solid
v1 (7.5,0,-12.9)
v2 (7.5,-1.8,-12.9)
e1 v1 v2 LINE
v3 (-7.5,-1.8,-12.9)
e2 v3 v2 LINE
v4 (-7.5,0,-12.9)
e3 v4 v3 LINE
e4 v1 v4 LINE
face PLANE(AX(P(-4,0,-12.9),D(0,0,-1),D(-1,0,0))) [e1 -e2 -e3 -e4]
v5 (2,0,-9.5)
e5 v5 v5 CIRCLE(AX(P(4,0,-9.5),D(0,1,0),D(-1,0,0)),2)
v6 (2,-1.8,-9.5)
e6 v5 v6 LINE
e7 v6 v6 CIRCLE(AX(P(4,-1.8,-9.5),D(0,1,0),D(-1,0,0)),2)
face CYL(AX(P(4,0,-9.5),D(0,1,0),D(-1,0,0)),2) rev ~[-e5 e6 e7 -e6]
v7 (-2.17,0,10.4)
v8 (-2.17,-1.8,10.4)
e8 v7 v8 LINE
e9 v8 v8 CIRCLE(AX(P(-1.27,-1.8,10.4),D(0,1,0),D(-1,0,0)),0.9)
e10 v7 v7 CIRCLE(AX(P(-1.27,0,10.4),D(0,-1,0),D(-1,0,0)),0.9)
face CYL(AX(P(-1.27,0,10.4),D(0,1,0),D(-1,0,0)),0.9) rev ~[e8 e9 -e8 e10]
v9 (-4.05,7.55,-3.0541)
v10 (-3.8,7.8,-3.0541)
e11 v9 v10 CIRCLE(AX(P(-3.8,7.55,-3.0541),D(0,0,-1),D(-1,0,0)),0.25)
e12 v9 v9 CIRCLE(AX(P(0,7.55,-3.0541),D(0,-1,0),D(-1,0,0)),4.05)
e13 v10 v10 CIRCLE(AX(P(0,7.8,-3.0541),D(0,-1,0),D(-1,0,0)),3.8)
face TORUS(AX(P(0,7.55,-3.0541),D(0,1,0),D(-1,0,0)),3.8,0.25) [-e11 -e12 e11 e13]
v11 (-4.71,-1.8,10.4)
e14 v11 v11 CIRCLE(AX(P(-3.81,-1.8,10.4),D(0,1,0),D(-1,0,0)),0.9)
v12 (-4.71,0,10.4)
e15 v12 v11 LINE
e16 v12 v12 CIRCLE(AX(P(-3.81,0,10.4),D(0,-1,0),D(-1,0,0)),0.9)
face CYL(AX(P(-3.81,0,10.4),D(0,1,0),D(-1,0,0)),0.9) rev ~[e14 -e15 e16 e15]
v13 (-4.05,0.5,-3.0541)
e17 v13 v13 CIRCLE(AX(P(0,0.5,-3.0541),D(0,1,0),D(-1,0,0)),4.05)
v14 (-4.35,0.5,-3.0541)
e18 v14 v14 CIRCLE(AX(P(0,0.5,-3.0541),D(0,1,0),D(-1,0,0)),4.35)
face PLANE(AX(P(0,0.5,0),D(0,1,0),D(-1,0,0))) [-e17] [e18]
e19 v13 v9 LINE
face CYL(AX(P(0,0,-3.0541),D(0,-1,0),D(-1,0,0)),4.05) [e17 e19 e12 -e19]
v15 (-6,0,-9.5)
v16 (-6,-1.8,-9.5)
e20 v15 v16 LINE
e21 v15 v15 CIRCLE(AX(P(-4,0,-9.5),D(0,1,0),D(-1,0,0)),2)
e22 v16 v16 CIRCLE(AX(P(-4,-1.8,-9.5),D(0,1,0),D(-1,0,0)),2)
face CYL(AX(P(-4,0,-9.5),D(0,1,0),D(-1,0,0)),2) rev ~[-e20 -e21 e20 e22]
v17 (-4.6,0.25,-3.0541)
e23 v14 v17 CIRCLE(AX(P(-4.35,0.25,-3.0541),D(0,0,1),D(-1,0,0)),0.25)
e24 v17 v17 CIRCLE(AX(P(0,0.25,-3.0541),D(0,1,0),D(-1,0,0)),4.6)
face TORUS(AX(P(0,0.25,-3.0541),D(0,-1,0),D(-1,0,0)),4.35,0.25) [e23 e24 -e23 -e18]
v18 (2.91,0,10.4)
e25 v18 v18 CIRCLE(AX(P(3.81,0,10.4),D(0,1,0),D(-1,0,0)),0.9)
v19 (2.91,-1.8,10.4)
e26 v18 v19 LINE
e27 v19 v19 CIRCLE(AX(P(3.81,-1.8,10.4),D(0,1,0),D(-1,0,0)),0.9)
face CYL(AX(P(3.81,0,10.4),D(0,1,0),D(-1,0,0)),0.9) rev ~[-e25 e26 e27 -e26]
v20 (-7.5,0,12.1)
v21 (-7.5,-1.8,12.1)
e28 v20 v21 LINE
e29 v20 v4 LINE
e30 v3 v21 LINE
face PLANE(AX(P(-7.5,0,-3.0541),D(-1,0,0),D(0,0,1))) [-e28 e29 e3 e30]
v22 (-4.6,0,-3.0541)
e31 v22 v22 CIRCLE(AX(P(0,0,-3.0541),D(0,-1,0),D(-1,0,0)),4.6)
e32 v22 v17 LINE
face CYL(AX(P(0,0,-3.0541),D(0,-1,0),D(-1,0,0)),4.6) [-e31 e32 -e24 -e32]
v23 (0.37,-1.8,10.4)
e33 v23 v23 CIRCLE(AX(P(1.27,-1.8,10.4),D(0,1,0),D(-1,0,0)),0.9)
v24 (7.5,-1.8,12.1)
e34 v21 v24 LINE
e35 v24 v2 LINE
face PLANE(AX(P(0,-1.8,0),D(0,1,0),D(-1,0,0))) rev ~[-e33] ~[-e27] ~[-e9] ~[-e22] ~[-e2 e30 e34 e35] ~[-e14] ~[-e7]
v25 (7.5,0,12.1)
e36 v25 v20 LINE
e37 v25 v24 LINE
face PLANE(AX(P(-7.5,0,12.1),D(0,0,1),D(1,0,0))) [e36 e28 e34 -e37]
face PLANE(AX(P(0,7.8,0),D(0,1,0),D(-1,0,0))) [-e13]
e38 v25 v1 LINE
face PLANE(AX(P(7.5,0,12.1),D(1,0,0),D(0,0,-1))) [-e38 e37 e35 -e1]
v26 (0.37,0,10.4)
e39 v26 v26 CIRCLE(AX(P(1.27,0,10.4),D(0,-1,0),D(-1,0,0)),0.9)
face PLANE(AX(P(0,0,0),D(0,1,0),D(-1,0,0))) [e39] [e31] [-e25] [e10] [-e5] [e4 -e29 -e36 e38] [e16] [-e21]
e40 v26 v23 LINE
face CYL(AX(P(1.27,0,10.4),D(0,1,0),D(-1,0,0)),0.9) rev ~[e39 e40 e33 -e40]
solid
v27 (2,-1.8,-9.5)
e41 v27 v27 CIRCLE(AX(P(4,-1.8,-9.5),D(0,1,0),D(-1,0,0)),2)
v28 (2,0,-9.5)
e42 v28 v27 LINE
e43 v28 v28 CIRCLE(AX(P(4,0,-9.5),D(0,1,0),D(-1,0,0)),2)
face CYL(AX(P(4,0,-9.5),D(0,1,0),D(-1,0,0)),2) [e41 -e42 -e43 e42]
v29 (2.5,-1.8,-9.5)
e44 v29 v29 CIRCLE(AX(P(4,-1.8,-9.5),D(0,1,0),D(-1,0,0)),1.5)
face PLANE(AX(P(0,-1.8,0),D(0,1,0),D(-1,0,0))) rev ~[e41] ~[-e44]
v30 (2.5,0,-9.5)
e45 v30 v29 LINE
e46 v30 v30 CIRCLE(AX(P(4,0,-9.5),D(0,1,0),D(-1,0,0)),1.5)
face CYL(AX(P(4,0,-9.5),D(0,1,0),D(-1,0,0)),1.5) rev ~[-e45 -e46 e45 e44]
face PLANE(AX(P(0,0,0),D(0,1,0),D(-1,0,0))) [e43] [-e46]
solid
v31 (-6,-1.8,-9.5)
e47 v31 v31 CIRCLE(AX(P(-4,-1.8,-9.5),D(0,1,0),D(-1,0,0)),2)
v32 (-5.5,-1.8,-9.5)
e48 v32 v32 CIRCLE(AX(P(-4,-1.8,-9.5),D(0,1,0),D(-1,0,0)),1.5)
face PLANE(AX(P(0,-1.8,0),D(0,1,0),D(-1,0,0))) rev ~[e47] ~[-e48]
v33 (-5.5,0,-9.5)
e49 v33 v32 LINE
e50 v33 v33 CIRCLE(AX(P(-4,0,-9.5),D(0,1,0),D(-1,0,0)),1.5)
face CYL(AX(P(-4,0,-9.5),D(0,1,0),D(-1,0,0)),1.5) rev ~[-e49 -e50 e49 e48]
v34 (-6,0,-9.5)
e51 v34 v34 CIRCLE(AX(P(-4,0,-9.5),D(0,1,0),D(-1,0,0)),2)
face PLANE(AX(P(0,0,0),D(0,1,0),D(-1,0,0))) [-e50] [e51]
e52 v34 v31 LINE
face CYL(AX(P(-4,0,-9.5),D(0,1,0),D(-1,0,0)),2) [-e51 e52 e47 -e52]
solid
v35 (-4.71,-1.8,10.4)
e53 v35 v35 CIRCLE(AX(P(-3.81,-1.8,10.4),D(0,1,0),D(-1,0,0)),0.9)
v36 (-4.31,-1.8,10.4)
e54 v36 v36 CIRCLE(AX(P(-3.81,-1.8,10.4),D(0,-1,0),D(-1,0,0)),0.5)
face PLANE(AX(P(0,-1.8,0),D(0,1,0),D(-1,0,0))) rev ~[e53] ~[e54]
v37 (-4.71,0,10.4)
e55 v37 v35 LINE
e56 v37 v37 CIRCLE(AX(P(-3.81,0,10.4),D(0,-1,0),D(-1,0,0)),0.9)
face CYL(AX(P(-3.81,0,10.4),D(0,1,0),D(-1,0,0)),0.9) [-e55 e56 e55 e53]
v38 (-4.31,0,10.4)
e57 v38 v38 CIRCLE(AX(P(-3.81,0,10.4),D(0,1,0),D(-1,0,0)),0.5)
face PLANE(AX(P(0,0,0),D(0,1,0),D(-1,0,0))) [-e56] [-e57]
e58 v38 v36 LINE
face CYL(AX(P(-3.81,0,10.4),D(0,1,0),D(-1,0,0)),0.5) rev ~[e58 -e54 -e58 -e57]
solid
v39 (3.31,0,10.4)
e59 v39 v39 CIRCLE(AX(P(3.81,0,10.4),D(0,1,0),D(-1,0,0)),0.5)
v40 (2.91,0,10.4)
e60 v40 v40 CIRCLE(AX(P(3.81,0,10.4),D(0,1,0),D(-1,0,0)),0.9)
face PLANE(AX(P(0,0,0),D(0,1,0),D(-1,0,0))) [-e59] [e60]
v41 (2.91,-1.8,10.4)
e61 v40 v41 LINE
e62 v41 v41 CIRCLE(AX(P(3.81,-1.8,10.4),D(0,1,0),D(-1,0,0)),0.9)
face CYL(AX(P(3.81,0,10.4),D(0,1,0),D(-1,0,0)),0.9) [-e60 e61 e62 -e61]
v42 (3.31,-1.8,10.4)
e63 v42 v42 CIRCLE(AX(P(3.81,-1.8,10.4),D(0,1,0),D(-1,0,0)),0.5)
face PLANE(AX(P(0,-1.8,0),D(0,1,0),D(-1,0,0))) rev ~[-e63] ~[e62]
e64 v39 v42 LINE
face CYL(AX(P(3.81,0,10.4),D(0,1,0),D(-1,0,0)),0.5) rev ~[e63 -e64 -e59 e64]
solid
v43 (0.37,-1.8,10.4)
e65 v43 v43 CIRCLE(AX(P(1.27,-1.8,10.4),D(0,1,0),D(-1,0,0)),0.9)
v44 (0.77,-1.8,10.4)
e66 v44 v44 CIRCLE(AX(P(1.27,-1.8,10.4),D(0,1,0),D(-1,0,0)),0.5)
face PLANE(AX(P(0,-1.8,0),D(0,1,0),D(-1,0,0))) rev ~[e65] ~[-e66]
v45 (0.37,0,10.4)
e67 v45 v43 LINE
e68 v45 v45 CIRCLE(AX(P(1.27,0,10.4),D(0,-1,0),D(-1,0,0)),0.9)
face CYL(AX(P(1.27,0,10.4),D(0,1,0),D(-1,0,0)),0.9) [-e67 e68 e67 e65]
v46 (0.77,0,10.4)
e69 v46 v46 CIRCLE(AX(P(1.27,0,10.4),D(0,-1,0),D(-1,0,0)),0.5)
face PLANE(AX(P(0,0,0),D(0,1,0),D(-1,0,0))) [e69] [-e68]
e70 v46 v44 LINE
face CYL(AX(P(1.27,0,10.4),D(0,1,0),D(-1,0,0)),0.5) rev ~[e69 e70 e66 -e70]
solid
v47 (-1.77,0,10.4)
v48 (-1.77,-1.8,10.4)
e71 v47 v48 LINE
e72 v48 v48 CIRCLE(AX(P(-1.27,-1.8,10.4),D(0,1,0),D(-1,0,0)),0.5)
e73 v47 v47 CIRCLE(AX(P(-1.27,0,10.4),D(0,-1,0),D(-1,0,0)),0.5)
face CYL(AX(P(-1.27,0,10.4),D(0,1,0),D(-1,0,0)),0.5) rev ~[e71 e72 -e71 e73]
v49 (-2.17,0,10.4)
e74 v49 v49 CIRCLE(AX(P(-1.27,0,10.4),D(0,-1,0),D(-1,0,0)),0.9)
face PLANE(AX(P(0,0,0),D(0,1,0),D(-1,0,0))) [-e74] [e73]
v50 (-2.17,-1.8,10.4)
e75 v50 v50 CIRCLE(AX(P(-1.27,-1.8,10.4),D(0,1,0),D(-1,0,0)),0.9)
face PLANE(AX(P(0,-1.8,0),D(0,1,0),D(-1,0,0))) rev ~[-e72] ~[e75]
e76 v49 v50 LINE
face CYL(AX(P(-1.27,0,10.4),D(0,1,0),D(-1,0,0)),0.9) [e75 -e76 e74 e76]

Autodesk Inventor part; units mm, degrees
ref_plane "YZ Plane" through (0, 0, 0) normal (1, 0, 0) x (0, 1, 0)
ref_plane "XZ Plane" through (0, 0, 0) normal (0, 1, 0) x (-1, 0, 0)
ref_plane "XY Plane" through (0, 0, 0) normal (0, 0, 1) x (1, 0, 0)
sketch "Sketch1" plane through (0, 0, 0) normal (0, 1, 0) x (-1, 0, 0)
  line L0 (7.5, 12.1) -> (-7.5, 12.1)
  line L1 (-7.5, 12.1) -> (-7.5, -12.9)
  line L2 (-7.5, -12.9) -> (7.5, -12.9)
  line L3 (7.5, -12.9) -> (7.5, 12.1)
  circle A0 centre (0, -3.0541) radius 4.05
  circle A1 centre (0, -3.0541) radius 4.6
  circle A2 centre (4, -9.5) radius 1.5
  line L4 (7.5, -12.9) -> (4, -12.9)
  circle A3 centre (-4, -9.5) radius 1.5
  circle A4 centre (4, -9.5) radius 2
  circle A5 centre (-4, -9.5) radius 2
  line L5 (0, -3.0541) -> (7.5, -3.0541)
  line L6 (7.5, -3.0541) -> (7.5, -12.9)
  line L7 (7.5, -12.9) -> (0, -12.9)
  line L8 (0, -12.9) -> (0, -3.0541)
  line L9 (8.662, 14.258) -> (8.662, -14.1579) construction
  line L10 (8.662, -14.1579) -> (-25.9569, -14.1579) construction
  line L11 (-25.9569, -14.1579) -> (-25.9569, 14.258) construction
  line L12 (-25.9569, 14.258) -> (8.662, 14.258) construction
  line L13 (0, -3.0541) -> (0, 12.1)
  line L14 (0, 12.1) -> (0, 10.4)
  line L15 (0, 10.4) -> (1.27, 10.4)
  line L16 (1.27, 10.4) -> (3.81, 10.4)
  line L17 (0, 10.4) -> (-1.27, 10.4)
  line L18 (-1.27, 10.4) -> (-3.81, 10.4)
  circle A6 centre (1.27, 10.4) radius 0.5
  circle A7 centre (3.81, 10.4) radius 0.5
  circle A8 centre (3.81, 10.4) radius 0.9
  circle A9 centre (1.27, 10.4) radius 0.9
  circle A10 centre (-1.27, 10.4) radius 0.9
  circle A11 centre (-3.81, 10.4) radius 0.9
  circle A12 centre (-1.27, 10.4) radius 0.5
  circle A13 centre (-3.81, 10.4) radius 0.5
  point P0 (0, 0)
  dimension "d0" = 15
  dimension "d1" = 25
  dimension "d64" = 8.1
  dimension "d68" = 9.2
  dimension "d73" = 3
  dimension "d83" = 3
  dimension "d99" = 0.5
  dimension "d100" = 0.5
  dimension "d113" = 9.846
  dimension "d114" = 3.5
  dimension "d115" = 3.4
  dimension "d143" = 1.7
  dimension "d144" = 1.27
  dimension "d145" = 2.54
  dimension "d146" = 1.27
  dimension "d147" = 2.54
  dimension "d148" = 1
  dimension "d149" = 1
  dimension "d150" = 1.8
  dimension "d151" = 1.8
  dimension "d152" = 1.8
  dimension "d153" = 1.8
  dimension "d154" = 1
  dimension "d155" = 1
extrude "Extrusion1" add sketch "Sketch1" against normal blind 1.8 contours L3 L5 A1 L13 L0 | L13 A1 L8 L2 L1 L0 | L3 L2 L8 A1 L5 | L5 A0 L13 A1 | A1 L8 A0 L5 | L13 A0 L8 A1 | L5 L13 A0 | A0 L8 L5 | L13 L8 A0 | A2 | A3 | A4 | A5 | A9 L16 A6 L15 | L15 A6 L16 A9 | A6 L16 L15 | L15 L16 A6 | A10 L18 A12 L17 | L17 A12 L18 A10 | A12 L18 L17 | L17 L18 A12 | A7 | A8 | A11 | A13
extrude "Extrusion2" cut sketch "Sketch1" against normal through all contours A2 | A3 | A4 | A5
extrude "Extrusion3" add sketch "Sketch1" against normal blind 1.8 contours A4 | A5
extrude "Extrusion4" add sketch "Sketch1" along normal blind 7.8 contours L5 L13 A0 | A0 L8 L5 | L13 L8 A0
extrude "Extrusion5" add sketch "Sketch1" along normal blind 0.5 contours L5 A0 L13 A1 | A1 L8 A0 L5 | L13 A0 L8 A1
fillet "Fillet1" radius 0.25 1 edges at (4.05, 7.8, -3.0541)
fillet "Fillet2" radius 0.25 1 edges at (4.6, 0.5, -3.0541)
extrude "Extrusion6" cut sketch "Sketch1" against normal blind 10 contours A6 L16 L15 | L15 L16 A6 | A12 L18 L17 | L17 L18 A12 | A7 | A13
extrude "Extrusion7" cut sketch "Sketch1" against normal blind 10 contours A9 L16 A6 L15 | L15 A6 L16 A9 | A10 L18 A12 L17 | L17 A12 L18 A10 | A8 | A11
extrude "Extrusion8" add sketch "Sketch1" against normal up to surface (1.8 mm away) separate body contours A4 | A5 | A9 L16 A6 L15 | L15 A6 L16 A9 | A10 L18 A12 L17 | L17 A12 L18 A10 | A8 | A11
extrude "Extrusion9" cut sketch "Sketch1" against normal through all contours A4 | A5 bodies 1
properties part number "Gas_Sensorsipt"
